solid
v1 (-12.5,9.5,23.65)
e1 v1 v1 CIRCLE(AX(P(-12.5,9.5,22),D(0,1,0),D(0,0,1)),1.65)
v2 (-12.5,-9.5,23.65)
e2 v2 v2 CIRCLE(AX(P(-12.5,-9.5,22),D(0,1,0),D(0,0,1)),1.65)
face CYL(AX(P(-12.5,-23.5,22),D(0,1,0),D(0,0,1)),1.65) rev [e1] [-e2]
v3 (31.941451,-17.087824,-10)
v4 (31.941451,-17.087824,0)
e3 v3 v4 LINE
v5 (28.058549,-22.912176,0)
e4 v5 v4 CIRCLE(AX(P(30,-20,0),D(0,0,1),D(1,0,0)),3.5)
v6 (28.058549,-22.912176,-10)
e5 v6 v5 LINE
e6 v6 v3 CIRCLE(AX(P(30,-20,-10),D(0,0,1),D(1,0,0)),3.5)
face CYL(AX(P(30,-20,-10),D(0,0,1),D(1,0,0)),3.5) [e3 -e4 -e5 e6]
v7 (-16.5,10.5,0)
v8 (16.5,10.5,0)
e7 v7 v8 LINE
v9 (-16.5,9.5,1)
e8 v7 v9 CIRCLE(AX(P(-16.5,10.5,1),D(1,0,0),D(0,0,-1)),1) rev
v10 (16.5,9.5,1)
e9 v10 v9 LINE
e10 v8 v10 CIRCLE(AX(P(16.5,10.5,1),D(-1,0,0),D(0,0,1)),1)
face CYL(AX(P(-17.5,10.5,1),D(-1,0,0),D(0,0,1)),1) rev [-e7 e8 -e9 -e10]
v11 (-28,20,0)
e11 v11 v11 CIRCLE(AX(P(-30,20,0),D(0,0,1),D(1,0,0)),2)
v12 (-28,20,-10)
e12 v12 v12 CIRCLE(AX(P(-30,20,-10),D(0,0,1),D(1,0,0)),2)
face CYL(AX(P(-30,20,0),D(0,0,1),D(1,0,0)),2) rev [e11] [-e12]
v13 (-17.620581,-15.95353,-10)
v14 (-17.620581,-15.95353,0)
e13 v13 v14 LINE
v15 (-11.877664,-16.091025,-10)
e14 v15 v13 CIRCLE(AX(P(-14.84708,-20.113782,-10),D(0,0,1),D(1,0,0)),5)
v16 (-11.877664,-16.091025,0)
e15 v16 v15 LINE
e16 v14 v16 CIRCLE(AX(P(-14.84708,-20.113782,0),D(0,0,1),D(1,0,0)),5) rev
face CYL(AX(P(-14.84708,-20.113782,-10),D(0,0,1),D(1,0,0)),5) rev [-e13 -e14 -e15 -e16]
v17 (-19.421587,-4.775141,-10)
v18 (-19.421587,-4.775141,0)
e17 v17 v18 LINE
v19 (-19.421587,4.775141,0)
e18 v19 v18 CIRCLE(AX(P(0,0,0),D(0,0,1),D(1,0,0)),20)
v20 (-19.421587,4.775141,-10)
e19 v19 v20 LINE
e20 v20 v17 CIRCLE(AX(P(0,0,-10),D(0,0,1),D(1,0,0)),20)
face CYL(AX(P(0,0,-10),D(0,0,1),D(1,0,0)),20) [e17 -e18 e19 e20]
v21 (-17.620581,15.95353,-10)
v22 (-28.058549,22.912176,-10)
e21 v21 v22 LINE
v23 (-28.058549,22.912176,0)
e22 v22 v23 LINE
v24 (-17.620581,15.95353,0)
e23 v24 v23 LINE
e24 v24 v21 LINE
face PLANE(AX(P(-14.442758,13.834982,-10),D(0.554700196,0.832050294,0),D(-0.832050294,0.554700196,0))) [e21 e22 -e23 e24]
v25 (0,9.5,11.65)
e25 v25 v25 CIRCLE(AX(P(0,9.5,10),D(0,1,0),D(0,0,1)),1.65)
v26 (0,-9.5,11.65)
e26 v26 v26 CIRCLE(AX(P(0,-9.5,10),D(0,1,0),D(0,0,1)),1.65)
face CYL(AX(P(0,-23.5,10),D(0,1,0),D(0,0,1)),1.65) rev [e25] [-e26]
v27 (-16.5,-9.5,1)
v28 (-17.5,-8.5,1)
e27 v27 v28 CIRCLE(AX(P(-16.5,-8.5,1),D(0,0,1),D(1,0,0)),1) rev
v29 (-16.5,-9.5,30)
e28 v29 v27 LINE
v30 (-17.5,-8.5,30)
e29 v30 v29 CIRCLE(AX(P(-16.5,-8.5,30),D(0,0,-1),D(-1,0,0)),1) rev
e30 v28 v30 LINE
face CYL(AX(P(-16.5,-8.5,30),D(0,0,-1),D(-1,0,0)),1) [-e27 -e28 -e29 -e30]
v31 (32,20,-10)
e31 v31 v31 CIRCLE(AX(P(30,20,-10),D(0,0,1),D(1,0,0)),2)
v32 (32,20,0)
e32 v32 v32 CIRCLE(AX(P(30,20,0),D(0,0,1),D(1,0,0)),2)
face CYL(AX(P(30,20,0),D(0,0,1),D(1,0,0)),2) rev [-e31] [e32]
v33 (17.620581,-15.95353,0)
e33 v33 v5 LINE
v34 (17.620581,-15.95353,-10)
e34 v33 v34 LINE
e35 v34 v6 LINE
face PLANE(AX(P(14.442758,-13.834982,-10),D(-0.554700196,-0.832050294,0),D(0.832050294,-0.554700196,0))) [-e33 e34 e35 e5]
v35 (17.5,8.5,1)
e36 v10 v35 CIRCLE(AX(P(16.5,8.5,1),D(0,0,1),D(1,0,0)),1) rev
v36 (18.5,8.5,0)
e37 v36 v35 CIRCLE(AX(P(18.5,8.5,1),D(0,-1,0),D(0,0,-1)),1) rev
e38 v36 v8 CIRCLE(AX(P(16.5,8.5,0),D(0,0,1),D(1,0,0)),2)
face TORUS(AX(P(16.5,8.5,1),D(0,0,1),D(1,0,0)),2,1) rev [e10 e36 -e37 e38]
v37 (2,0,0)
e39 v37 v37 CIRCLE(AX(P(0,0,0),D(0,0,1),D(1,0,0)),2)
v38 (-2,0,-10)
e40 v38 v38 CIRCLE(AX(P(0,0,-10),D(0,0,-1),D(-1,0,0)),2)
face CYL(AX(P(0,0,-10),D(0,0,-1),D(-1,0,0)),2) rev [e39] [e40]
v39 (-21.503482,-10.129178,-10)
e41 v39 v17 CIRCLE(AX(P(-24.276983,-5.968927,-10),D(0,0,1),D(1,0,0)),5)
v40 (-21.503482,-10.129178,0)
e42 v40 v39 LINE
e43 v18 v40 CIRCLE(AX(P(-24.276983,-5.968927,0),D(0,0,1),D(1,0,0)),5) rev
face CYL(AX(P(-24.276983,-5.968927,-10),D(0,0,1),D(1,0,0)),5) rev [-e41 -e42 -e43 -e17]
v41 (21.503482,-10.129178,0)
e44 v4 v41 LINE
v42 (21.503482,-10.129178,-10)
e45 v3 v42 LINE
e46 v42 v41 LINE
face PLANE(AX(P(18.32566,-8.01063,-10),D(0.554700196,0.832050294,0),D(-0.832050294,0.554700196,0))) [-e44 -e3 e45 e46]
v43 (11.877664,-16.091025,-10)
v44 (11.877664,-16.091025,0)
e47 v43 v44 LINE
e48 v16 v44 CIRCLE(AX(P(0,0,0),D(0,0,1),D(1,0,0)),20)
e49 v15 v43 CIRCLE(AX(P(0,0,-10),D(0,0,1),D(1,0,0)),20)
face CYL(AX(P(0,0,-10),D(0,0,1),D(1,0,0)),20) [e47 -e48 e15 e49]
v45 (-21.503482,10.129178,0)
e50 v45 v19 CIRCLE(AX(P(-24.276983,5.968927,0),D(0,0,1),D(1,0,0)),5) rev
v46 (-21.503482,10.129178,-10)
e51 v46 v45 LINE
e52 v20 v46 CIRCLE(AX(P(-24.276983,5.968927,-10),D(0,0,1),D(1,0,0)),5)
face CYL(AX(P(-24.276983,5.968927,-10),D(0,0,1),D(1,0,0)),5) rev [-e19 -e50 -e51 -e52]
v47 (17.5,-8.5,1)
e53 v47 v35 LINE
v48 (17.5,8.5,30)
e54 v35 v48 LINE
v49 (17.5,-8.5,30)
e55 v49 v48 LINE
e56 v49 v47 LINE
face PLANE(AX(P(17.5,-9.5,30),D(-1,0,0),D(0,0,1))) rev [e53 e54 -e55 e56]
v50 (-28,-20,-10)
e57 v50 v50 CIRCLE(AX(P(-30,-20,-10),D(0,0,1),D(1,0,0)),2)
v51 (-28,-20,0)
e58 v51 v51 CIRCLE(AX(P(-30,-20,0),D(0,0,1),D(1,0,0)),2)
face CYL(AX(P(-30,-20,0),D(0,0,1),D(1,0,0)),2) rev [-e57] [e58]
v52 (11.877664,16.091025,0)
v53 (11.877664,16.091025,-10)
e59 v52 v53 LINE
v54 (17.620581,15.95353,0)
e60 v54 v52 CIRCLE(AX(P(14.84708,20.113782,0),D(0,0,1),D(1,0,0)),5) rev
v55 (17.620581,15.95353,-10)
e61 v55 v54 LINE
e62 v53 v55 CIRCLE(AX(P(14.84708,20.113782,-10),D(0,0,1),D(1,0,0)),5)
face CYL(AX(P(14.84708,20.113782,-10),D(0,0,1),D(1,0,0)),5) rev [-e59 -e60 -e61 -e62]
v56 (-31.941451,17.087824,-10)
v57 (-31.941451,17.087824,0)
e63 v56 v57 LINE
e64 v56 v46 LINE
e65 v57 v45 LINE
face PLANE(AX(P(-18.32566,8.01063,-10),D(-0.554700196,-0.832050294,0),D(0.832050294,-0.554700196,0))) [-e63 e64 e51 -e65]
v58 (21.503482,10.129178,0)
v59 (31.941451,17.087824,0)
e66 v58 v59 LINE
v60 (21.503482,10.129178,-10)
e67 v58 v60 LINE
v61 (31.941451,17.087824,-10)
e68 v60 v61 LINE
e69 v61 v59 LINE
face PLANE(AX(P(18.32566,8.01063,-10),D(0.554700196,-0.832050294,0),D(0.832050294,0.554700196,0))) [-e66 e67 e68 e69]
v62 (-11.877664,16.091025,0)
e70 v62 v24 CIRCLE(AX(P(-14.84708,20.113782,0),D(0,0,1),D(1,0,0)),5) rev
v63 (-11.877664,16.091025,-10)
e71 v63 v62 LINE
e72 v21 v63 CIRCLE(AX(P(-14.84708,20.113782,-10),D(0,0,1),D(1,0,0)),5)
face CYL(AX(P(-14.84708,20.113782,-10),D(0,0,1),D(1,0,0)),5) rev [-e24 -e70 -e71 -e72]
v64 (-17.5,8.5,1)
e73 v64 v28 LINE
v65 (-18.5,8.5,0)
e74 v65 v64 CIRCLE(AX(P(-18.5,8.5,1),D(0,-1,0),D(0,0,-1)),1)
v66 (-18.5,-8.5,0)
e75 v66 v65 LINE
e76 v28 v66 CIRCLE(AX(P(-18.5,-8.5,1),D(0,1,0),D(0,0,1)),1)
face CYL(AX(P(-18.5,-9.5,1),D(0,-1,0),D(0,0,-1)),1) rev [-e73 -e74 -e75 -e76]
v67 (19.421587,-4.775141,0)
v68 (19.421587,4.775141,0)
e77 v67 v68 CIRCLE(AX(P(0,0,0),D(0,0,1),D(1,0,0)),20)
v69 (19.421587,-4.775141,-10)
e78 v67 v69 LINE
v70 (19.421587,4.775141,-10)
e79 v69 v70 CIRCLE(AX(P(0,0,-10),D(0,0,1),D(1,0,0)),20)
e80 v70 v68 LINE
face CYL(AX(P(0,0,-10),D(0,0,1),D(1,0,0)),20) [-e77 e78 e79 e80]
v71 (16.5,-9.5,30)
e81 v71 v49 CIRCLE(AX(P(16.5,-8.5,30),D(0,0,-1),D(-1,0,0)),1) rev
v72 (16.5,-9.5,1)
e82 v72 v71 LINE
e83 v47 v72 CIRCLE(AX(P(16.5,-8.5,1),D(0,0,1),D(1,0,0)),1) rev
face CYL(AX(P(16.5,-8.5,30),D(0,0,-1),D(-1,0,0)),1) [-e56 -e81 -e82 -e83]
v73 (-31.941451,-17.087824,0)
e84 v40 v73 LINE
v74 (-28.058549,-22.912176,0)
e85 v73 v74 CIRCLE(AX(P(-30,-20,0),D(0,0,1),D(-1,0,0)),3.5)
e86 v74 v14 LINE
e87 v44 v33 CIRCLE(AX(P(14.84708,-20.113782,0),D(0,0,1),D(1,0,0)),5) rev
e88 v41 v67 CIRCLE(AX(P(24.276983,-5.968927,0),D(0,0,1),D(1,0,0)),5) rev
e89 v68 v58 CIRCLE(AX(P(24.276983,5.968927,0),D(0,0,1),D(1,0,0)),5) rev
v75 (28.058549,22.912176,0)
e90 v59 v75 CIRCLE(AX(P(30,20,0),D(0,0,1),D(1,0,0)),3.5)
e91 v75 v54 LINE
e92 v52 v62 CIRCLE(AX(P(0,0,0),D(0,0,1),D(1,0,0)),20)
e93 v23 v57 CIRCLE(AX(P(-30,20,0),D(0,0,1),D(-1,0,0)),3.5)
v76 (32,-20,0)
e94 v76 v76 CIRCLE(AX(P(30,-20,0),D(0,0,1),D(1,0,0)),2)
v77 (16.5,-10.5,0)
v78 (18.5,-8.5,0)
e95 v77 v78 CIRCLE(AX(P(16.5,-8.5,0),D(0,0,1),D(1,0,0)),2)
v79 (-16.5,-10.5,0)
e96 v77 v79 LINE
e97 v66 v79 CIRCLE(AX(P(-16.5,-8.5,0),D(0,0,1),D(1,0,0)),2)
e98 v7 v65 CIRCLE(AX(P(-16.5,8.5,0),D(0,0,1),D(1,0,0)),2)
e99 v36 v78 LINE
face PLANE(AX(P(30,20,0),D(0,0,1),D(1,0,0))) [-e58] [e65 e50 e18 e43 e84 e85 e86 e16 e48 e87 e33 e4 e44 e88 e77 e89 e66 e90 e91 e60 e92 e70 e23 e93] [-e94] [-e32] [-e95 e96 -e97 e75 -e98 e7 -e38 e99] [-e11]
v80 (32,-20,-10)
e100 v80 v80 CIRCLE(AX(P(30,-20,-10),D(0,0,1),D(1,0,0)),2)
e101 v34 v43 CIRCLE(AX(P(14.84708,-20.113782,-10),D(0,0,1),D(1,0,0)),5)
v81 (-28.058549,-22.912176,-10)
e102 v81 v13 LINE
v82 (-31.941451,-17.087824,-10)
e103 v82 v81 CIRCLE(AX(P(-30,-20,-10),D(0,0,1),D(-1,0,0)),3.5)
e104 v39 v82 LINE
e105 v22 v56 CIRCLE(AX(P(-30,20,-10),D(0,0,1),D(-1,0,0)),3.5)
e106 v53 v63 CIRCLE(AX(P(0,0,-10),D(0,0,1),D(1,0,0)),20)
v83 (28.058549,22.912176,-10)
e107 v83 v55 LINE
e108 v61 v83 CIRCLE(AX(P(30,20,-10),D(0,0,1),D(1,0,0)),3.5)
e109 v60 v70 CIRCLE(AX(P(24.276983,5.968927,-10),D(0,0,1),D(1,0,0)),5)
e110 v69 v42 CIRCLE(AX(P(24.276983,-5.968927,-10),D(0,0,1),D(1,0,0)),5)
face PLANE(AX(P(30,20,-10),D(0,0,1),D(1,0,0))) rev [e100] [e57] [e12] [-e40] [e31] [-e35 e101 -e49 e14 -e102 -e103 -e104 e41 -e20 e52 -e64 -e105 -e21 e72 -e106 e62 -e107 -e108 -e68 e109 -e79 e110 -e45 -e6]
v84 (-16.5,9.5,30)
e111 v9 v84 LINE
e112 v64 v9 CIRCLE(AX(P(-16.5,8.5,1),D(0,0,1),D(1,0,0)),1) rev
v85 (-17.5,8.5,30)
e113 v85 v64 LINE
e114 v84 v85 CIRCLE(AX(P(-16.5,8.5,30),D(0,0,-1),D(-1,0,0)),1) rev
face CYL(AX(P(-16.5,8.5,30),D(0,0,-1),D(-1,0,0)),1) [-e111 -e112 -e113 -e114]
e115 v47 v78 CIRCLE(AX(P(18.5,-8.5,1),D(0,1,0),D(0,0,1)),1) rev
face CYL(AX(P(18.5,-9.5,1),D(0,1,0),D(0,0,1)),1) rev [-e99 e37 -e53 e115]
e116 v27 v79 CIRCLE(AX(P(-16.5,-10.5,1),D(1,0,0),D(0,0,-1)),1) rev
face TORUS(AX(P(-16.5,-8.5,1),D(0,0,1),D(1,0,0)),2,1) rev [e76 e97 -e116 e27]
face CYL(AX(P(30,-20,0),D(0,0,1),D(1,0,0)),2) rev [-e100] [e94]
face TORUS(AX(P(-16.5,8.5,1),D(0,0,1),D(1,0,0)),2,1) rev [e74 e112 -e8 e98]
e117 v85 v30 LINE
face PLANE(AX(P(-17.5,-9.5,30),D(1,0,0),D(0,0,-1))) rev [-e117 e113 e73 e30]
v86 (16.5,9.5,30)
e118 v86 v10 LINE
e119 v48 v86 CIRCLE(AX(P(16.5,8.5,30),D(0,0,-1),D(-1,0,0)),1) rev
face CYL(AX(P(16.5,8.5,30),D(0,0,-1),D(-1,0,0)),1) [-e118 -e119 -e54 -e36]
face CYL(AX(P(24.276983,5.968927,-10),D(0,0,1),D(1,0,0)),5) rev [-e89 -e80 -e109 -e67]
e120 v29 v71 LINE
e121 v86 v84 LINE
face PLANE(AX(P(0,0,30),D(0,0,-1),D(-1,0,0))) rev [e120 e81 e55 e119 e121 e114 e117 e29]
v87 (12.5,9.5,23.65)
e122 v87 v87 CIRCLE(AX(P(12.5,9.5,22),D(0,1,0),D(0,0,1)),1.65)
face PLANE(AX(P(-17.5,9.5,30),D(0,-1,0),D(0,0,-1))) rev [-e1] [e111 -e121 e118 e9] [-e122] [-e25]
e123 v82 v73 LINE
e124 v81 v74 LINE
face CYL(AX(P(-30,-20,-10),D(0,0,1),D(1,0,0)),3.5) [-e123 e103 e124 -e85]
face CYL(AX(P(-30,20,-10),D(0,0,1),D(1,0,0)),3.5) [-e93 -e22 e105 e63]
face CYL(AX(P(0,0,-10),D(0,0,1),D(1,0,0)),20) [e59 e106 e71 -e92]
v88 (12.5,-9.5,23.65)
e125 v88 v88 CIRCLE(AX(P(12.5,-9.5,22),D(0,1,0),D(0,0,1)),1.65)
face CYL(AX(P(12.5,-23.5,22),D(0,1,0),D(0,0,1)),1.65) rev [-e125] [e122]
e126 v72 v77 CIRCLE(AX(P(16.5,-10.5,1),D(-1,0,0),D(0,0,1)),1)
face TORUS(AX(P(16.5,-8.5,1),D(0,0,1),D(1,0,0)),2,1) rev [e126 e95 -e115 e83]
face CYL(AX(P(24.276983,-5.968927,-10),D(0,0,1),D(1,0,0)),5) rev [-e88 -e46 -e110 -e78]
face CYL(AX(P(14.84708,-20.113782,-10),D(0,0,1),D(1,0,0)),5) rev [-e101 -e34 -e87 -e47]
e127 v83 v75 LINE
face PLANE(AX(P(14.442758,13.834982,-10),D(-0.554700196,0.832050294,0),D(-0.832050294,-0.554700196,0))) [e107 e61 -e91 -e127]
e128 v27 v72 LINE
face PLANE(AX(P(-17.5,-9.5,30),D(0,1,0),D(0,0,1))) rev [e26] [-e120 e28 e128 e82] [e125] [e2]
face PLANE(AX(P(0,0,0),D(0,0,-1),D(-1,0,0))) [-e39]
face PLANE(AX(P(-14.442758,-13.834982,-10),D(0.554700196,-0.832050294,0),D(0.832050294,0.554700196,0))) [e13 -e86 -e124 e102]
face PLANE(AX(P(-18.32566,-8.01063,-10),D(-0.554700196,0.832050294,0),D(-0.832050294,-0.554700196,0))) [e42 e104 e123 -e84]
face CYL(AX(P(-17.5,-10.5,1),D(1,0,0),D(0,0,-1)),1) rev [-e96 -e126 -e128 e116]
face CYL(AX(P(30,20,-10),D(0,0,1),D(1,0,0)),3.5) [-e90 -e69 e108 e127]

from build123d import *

# Parameters (mm, degrees)
BASE_FLANGE1_DEPTH        = 10
F_4_0MM_DOWEL_HOLE1_D     = 4
F_4_0MM_DOWEL_HOLE1_DEPTH = 16
F_4_0MM_DOWEL_HOLE1_TIP   = 1.201721238
FILLET1_R                 = 5
F_4_0MM_DOWEL_HOLE2_D     = 4
F_4_0MM_DOWEL_HOLE2_DEPTH = 16
F_4_0MM_DOWEL_HOLE2_TIP   = 1.201721238
SKETCH17_W                = 35
SKETCH17_H                = 19
BOSS_EXTRUDE1_DEPTH       = 30
SKETCH18_R                = 1.65
CUT_EXTRUDE1_DEPTH        = 56.778580118
FILLET2_R                 = 1


# Sheet-metal steps are written as plain solids
with BuildPart() as part:
    # Sketch1 → Base-Flange1 (new body)
    with BuildSketch(Plane.XY):
        with BuildLine():
            Line((14.442758409, 13.834982094), (28.058549313, 22.91217603))
            ThreePointArc((28.058549313, 22.91217603), (32.91217603, 21.941450687), (31.941450687, 17.08782397))
            Line((31.941450687, 17.08782397), (18.325659783, 8.010630034))
            ThreePointArc((18.325659783, 8.010630034), (20, 0), (18.325659783, -8.010630034))
            Line((18.325659783, -8.010630034), (31.941450687, -17.08782397))
            ThreePointArc((31.941450687, -17.08782397), (32.91217603, -21.941450687), (28.058549313, -22.91217603))
            Line((28.058549313, -22.91217603), (14.442758409, -13.834982094))
            ThreePointArc((14.442758409, -13.834982094), (0, -20), (-14.442758409, -13.834982094))
            Line((-14.442758409, -13.834982094), (-28.058549313, -22.91217603))
            ThreePointArc((-28.058549313, -22.91217603), (-32.91217603, -21.941450687), (-31.941450687, -17.08782397))
            Line((-31.941450687, -17.08782397), (-18.325659783, -8.010630034))
            ThreePointArc((-18.325659783, -8.010630034), (-20, 0), (-18.325659783, 8.010630034))
            Line((-18.325659783, 8.010630034), (-31.941450687, 17.08782397))
            ThreePointArc((-31.941450687, 17.08782397), (-32.91217603, 21.941450687), (-28.058549313, 22.91217603))
            Line((-28.058549313, 22.91217603), (-14.442758409, 13.834982094))
            ThreePointArc((-14.442758409, 13.834982094), (0, 20), (14.442758409, 13.834982094))
        make_face()
    extrude(amount=-BASE_FLANGE1_DEPTH)

    # Ø4.0mm Dowel Hole1
    with Locations(Plane.XY):
        with Locations((-30, 20), (30, -20), (-30, -20), (30, 20)):
            Hole(F_4_0MM_DOWEL_HOLE1_D / 2, depth=F_4_0MM_DOWEL_HOLE1_DEPTH)
            with Locations((0, 0, -(F_4_0MM_DOWEL_HOLE1_DEPTH + F_4_0MM_DOWEL_HOLE1_TIP / 2))):  # 118° drill point
                Cone(0, F_4_0MM_DOWEL_HOLE1_D / 2, F_4_0MM_DOWEL_HOLE1_TIP, mode=Mode.SUBTRACT)

    # Fillet1
    fillet1_edges = [part.edges().sort_by_distance(p)[0] for p in [
        (18.325659783, 8.010630034, -5),
        (18.325659783, -8.010630034, -5),
        (14.442758409, -13.834982094, -5),
        (-14.442758409, -13.834982094, -5),
        (-18.325659783, -8.010630034, -5),
        (-18.325659783, 8.010630034, -5),
        (-14.442758409, 13.834982094, -5),
        (14.442758409, 13.834982094, -5),
    ]]
    fillet(fillet1_edges, radius=FILLET1_R)

    # Ø4.0mm Dowel Hole2
    with Locations(Plane(origin=(0, 0, -10), x_dir=(-1, 0, 0), z_dir=(0, 0, -1))):
        with Locations((0, 0)):
            Hole(F_4_0MM_DOWEL_HOLE2_D / 2, depth=F_4_0MM_DOWEL_HOLE2_DEPTH)
            with Locations((0, 0, -(F_4_0MM_DOWEL_HOLE2_DEPTH + F_4_0MM_DOWEL_HOLE2_TIP / 2))):  # 118° drill point
                Cone(0, F_4_0MM_DOWEL_HOLE2_D / 2, F_4_0MM_DOWEL_HOLE2_TIP, mode=Mode.SUBTRACT)

    # Sketch17 → Boss-Extrude1 (add)
    with BuildSketch(Plane.XY):
        Rectangle(SKETCH17_W, SKETCH17_H)
    extrude(amount=BOSS_EXTRUDE1_DEPTH)

    # Sketch18 → Cut-Extrude1 (cut, through all)
    with BuildSketch(Plane(origin=(0, 9.5, 0), x_dir=(1, 0, 0), z_dir=(0, 1, 0))):
        with Locations(Location((0, -10, 0), (0, 0, 270))):
            Circle(SKETCH18_R)
        with Locations(Location((-12.5, -22, 0), (0, 0, 270))):
            Circle(SKETCH18_R)
        with Locations(Location((12.5, -22, 0), (0, 0, 270))):
            Circle(SKETCH18_R)
    extrude(amount=-CUT_EXTRUDE1_DEPTH, mode=Mode.SUBTRACT)

    # Fillet2
    fillet2_edges = [part.edges().sort_by_distance(p)[0] for p in [
        (17.5, 0, 0),
        (17.5, -9.5, 15),
        (0, 9.5, 0),
        (17.5, 9.5, 15),
        (-17.5, 0, 0),
        (-17.5, 9.5, 15),
        (0, -9.5, 0),
        (-17.5, -9.5, 15),
    ]]
    fillet(fillet2_edges, radius=FILLET2_R)


solid = part.part
